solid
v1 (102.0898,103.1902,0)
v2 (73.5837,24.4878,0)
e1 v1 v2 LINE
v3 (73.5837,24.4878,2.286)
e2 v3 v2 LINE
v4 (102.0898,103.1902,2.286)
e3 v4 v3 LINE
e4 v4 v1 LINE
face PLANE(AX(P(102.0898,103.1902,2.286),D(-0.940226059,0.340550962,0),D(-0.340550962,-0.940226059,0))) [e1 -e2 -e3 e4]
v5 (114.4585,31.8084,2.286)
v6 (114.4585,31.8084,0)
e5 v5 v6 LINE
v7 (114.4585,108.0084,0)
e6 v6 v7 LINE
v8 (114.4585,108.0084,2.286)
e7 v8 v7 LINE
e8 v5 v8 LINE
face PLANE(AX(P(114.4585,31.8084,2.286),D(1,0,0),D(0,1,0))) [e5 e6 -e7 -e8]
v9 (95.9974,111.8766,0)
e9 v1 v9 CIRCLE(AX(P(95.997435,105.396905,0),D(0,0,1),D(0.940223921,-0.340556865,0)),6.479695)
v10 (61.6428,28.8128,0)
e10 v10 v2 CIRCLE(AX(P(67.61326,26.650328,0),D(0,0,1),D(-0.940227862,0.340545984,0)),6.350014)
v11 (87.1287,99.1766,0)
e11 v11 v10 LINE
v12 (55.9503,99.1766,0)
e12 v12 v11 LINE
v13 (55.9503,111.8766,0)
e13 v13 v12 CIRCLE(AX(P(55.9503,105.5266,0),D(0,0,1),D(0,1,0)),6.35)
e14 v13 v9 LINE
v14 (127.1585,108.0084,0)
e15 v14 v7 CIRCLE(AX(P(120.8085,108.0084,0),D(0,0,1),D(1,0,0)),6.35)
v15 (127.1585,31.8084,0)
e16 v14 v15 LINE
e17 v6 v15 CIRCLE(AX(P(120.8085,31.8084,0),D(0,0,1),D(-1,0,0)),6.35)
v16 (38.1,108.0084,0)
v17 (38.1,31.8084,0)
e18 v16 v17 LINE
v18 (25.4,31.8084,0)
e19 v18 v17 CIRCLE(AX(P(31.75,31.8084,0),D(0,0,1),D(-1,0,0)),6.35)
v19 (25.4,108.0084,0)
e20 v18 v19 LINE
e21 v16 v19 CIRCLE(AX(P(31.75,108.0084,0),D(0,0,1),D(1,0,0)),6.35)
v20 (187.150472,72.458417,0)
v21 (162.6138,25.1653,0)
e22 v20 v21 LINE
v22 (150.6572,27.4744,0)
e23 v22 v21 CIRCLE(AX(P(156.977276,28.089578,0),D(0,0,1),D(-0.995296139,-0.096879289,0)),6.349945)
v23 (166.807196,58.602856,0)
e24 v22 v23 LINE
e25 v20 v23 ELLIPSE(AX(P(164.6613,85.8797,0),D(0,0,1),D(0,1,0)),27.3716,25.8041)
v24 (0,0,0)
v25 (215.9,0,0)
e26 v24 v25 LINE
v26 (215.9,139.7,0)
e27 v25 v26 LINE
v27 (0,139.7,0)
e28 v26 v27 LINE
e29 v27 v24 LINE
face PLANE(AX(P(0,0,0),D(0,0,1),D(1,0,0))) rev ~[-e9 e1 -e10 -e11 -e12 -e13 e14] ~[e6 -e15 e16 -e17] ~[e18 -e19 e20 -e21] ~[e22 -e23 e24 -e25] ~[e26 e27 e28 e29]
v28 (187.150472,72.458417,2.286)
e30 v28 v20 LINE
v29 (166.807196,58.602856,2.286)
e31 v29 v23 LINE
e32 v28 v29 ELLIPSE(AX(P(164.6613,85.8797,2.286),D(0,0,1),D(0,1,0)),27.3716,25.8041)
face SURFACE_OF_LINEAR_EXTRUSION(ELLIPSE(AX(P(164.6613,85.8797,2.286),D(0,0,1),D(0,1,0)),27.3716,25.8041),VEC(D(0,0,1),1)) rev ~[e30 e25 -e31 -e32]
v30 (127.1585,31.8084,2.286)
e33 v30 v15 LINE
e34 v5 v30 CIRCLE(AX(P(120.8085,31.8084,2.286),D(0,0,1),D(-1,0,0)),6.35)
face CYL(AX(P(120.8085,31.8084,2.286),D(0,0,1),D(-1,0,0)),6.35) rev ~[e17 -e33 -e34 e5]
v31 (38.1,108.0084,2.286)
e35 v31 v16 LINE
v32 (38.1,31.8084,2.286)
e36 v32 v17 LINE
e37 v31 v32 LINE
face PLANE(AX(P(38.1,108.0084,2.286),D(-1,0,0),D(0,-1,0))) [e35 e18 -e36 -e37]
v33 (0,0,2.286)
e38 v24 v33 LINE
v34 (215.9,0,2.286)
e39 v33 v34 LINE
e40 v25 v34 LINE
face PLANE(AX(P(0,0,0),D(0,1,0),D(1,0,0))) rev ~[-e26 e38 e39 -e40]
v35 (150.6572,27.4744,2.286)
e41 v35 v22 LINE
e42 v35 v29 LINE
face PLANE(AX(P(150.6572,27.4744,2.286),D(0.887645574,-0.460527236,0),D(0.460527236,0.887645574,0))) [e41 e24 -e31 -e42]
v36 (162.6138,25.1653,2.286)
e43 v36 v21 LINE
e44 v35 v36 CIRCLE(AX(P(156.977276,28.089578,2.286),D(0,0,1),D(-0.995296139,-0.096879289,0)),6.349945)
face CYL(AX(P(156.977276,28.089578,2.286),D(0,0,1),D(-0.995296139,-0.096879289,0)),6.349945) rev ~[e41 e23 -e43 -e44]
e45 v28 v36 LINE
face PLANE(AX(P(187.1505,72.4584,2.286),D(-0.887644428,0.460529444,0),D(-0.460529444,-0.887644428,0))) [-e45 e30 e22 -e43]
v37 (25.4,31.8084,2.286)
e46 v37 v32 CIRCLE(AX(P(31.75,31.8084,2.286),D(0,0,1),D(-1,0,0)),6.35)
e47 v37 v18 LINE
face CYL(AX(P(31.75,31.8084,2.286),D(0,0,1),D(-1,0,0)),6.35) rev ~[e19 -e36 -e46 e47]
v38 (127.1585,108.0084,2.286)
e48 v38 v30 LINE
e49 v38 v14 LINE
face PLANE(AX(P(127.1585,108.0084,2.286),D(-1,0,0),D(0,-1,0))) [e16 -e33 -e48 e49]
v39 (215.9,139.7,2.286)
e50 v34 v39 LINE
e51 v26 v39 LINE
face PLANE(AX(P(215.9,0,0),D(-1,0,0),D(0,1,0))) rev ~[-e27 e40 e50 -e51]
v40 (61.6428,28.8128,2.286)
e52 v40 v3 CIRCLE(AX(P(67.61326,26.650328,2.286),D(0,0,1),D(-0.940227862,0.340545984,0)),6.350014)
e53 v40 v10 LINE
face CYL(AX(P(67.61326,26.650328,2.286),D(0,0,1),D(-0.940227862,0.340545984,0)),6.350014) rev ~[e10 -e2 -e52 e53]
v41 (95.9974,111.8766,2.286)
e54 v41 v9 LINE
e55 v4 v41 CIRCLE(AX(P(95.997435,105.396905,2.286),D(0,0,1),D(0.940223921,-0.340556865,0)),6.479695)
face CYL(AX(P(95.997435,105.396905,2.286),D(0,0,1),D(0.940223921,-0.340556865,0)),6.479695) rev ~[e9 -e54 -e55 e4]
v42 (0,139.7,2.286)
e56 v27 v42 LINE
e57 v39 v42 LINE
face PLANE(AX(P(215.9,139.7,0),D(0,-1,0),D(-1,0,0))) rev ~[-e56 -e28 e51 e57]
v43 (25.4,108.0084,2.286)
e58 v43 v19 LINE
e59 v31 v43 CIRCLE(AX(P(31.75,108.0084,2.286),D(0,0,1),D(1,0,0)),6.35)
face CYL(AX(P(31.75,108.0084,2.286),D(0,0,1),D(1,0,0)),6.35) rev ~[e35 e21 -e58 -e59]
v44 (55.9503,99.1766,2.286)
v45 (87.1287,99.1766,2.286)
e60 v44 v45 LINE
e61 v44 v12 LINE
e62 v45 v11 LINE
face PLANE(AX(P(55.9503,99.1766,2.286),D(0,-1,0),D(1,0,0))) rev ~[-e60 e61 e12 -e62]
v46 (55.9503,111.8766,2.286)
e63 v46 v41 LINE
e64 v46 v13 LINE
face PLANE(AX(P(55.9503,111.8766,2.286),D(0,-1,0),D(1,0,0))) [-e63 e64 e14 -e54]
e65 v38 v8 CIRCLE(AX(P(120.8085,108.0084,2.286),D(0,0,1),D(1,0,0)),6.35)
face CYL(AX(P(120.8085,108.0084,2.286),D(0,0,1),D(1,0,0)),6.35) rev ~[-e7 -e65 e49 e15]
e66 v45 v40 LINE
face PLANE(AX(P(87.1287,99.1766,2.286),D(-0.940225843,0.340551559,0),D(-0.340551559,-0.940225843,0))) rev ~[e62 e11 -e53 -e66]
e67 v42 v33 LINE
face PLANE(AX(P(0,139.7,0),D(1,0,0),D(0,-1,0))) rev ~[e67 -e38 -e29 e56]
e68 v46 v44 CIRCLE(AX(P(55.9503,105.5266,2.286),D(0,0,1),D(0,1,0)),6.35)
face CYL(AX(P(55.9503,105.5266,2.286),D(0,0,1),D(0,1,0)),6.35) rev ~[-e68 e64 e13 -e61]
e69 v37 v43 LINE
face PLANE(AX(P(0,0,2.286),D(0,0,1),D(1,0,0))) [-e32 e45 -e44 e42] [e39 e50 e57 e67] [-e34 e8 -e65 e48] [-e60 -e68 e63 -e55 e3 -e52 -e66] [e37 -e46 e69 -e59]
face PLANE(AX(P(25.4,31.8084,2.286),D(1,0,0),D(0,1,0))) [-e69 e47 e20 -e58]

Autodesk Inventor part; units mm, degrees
ref_plane "YZ Plane" through (0, 0, 0) normal (1, 0, 0) x (0, 1, 0)
ref_plane "XZ Plane" through (0, 0, 0) normal (0, 1, 0) x (-1, 0, 0)
ref_plane "XY Plane" through (0, 0, 0) normal (0, 0, 1) x (1, 0, 0)
sketch "Sketch1" plane through (0, 0, 0) normal (0, 0, 1) x (1, 0, 0)
  line L0 (0, 0) -> (215.9, 0)
  line L1 (215.9, 0) -> (215.9, 139.7)
  line L2 (215.9, 139.7) -> (0, 139.7)
  line L3 (0, 139.7) -> (0, 0)
  dimension "d0" = 215.9
  dimension "d1" = 139.7
extrude "Plate1" add sketch "Sketch1" along normal blind 2.286
sketch "Sketch2" plane through (0, 0, 2.286) normal (0, 0, 1) x (1, 0, 0)
  line L0 (0, 0) -> (0, 139.7) projected
  line L1 (215.9, 0) -> (0, 0) projected
  line L2 (215.9, 139.7) -> (215.9, 0) projected
  line L3 (0, 139.7) -> (215.9, 139.7) projected
sketch "Sketch3" plane through (0, 0, 2.286) normal (0, 0, 1) x (1, 0, 0)
  line L0 (0, 0) -> (0, 139.7)
  line L1 (215.9, 0) -> (0, 0)
  line L2 (215.9, 139.7) -> (215.9, 0)
  line L3 (0, 139.7) -> (215.9, 139.7)
  line L4 (38.1, 108.0084) -> (38.1, 31.8084)
  line L5 (25.4, 31.8084) -> (25.4, 108.0084)
  arc A0 (38.1, 108.0084) -> (25.4, 108.0084) centre (31.75, 108.0084) ccw
  arc A1 (25.4, 31.8084) -> (38.1, 31.8084) centre (31.75, 31.8084) ccw
  line L6 (127.1585, 108.0084) -> (127.1585, 31.8084)
  line L7 (114.4585, 31.8084) -> (114.4585, 108.0084)
  arc A2 (127.1585, 108.0084) -> (114.4585, 108.0084) centre (120.8085, 108.0084) ccw
  arc A3 (114.4585, 31.8084) -> (127.1585, 31.8084) centre (120.8085, 31.8084) ccw
  line L8 (55.9503, 111.8766) -> (95.9974, 111.8766)
  line L9 (102.0898, 103.1902) -> (73.5837, 24.4878)
  line L10 (55.9503, 99.1766) -> (87.1287, 99.1766)
  line L11 (87.1287, 99.1766) -> (61.6428, 28.8128)
  line L12 (73.5837, 24.4878) -> (73.5837, 24.4878)
  arc A4 (55.9503, 111.8766) -> (55.9503, 99.1766) centre (55.9503, 105.5266) ccw
  arc A5 (61.6428, 28.8128) -> (73.5837, 24.4878) centre (67.6132, 26.6503) ccw
  arc A6 (102.0898, 103.1902) -> (95.9974, 111.8766) centre (95.9974, 105.3969) ccw
  ellipse E0 centre (164.6613, 85.8797) end of major axis (164.6613, 113.2513) minor radius 25.8041 (187.1505, 72.4584) -> (166.8072, 58.6028) ccw
  line L13 (187.1505, 72.4584) -> (162.6138, 25.1653)
  arc A7 (150.6572, 27.4744) -> (162.6138, 25.1653) centre (156.9773, 28.0896) ccw
  line L14 (150.6572, 27.4744) -> (166.8072, 58.6028)
  dimension "d15" = 12.7
  dimension "d16" = 76.2
  dimension "d17" = 12.7
  dimension "d18" = 76.2
  dimension "d19" = 12.7
  dimension "d33" = 6.35
extrude "Cut2" cut sketch "Sketch3" against normal blind 2.286 contours L4 A1 L5 A0 | L6 A3 L7 A2 | L8 A6 L9 A5 L11 L10 A4 | L13 A7 L14 E0
sketch "Sketch4" plane through (0, 0, 2.286) normal (0, 0, 1) x (1, 0, 0)
  line L0 (87.1287, 99.1766) -> (55.9503, 99.1766) projected
  arc A0 (55.9503, 111.8766) -> (55.9503, 99.1766) centre (55.9503, 105.5266) ccw projected
  line L1 (55.9503, 111.8766) -> (95.9974, 111.8766) projected
  arc A1 (102.0898, 103.1902) -> (95.9974, 111.8766) centre (95.9974, 105.3969) ccw projected
  line L2 (102.0898, 103.1902) -> (73.5837, 24.4878) projected
  arc A2 (61.6428, 28.8128) -> (73.5837, 24.4878) centre (67.6132, 26.6503) ccw projected
  line L3 (61.6428, 28.8128) -> (87.1287, 99.1766) projected
  arc A3 (25.4, 31.8084) -> (38.1, 31.8084) centre (31.75, 31.8084) ccw projected
  line L4 (25.4, 31.8084) -> (25.4, 108.0084) projected
  arc A4 (38.1, 108.0084) -> (25.4, 108.0084) centre (31.75, 108.0084) ccw projected
  line L5 (38.1, 108.0084) -> (38.1, 31.8084) projected
  arc A5 (114.4585, 31.8084) -> (127.1585, 31.8084) centre (120.8085, 31.8084) ccw projected
  line L6 (114.4585, 31.8084) -> (114.4585, 108.0084) projected
  arc A6 (127.1585, 108.0084) -> (114.4585, 108.0084) centre (120.8085, 108.0084) ccw projected
  line L7 (127.1585, 108.0084) -> (127.1585, 31.8084) projected
  line L8 (150.6572, 27.4744) -> (166.8072, 58.6028) projected
  ellipse E0 centre (164.6613, 85.8797) end of major axis (164.6613, 113.2513) minor radius 25.8041 (187.1505, 72.4584) -> (166.8072, 58.6028) ccw projected
  line L9 (187.1505, 72.4584) -> (162.6138, 25.1653) projected
  arc A7 (150.6572, 27.4744) -> (162.6138, 25.1653) centre (156.9773, 28.0896) ccw projected
  line L10 (0, 0) -> (0, 139.7) projected
  line L11 (215.9, 0) -> (0, 0) projected
  line L12 (215.9, 139.7) -> (215.9, 0) projected
  line L13 (0, 139.7) -> (215.9, 139.7) projected
equation "\"d36\" = Thickness"
equation "\"BendRadius\" = Thickness"
equation "\"BendReliefWidth\" = Thickness"
equation "\"BendReliefDepth\" = 0.5 * Thickness"
equation "\"CornerReliefSize\" = 4 * Thickness"
equation "\"MinimumRemnant\" = 2 * Thickness"
equation "\"TransitionRadius\" = BendRadius"
equation "\"JacobiRadiusSize\" = BendRadius"
equation "\"GapSize\" = Thickness"
equation "\"d2\" = BendRadius"
equation "\"Thickness\" = 2.286"
properties part number "Number Plate"
